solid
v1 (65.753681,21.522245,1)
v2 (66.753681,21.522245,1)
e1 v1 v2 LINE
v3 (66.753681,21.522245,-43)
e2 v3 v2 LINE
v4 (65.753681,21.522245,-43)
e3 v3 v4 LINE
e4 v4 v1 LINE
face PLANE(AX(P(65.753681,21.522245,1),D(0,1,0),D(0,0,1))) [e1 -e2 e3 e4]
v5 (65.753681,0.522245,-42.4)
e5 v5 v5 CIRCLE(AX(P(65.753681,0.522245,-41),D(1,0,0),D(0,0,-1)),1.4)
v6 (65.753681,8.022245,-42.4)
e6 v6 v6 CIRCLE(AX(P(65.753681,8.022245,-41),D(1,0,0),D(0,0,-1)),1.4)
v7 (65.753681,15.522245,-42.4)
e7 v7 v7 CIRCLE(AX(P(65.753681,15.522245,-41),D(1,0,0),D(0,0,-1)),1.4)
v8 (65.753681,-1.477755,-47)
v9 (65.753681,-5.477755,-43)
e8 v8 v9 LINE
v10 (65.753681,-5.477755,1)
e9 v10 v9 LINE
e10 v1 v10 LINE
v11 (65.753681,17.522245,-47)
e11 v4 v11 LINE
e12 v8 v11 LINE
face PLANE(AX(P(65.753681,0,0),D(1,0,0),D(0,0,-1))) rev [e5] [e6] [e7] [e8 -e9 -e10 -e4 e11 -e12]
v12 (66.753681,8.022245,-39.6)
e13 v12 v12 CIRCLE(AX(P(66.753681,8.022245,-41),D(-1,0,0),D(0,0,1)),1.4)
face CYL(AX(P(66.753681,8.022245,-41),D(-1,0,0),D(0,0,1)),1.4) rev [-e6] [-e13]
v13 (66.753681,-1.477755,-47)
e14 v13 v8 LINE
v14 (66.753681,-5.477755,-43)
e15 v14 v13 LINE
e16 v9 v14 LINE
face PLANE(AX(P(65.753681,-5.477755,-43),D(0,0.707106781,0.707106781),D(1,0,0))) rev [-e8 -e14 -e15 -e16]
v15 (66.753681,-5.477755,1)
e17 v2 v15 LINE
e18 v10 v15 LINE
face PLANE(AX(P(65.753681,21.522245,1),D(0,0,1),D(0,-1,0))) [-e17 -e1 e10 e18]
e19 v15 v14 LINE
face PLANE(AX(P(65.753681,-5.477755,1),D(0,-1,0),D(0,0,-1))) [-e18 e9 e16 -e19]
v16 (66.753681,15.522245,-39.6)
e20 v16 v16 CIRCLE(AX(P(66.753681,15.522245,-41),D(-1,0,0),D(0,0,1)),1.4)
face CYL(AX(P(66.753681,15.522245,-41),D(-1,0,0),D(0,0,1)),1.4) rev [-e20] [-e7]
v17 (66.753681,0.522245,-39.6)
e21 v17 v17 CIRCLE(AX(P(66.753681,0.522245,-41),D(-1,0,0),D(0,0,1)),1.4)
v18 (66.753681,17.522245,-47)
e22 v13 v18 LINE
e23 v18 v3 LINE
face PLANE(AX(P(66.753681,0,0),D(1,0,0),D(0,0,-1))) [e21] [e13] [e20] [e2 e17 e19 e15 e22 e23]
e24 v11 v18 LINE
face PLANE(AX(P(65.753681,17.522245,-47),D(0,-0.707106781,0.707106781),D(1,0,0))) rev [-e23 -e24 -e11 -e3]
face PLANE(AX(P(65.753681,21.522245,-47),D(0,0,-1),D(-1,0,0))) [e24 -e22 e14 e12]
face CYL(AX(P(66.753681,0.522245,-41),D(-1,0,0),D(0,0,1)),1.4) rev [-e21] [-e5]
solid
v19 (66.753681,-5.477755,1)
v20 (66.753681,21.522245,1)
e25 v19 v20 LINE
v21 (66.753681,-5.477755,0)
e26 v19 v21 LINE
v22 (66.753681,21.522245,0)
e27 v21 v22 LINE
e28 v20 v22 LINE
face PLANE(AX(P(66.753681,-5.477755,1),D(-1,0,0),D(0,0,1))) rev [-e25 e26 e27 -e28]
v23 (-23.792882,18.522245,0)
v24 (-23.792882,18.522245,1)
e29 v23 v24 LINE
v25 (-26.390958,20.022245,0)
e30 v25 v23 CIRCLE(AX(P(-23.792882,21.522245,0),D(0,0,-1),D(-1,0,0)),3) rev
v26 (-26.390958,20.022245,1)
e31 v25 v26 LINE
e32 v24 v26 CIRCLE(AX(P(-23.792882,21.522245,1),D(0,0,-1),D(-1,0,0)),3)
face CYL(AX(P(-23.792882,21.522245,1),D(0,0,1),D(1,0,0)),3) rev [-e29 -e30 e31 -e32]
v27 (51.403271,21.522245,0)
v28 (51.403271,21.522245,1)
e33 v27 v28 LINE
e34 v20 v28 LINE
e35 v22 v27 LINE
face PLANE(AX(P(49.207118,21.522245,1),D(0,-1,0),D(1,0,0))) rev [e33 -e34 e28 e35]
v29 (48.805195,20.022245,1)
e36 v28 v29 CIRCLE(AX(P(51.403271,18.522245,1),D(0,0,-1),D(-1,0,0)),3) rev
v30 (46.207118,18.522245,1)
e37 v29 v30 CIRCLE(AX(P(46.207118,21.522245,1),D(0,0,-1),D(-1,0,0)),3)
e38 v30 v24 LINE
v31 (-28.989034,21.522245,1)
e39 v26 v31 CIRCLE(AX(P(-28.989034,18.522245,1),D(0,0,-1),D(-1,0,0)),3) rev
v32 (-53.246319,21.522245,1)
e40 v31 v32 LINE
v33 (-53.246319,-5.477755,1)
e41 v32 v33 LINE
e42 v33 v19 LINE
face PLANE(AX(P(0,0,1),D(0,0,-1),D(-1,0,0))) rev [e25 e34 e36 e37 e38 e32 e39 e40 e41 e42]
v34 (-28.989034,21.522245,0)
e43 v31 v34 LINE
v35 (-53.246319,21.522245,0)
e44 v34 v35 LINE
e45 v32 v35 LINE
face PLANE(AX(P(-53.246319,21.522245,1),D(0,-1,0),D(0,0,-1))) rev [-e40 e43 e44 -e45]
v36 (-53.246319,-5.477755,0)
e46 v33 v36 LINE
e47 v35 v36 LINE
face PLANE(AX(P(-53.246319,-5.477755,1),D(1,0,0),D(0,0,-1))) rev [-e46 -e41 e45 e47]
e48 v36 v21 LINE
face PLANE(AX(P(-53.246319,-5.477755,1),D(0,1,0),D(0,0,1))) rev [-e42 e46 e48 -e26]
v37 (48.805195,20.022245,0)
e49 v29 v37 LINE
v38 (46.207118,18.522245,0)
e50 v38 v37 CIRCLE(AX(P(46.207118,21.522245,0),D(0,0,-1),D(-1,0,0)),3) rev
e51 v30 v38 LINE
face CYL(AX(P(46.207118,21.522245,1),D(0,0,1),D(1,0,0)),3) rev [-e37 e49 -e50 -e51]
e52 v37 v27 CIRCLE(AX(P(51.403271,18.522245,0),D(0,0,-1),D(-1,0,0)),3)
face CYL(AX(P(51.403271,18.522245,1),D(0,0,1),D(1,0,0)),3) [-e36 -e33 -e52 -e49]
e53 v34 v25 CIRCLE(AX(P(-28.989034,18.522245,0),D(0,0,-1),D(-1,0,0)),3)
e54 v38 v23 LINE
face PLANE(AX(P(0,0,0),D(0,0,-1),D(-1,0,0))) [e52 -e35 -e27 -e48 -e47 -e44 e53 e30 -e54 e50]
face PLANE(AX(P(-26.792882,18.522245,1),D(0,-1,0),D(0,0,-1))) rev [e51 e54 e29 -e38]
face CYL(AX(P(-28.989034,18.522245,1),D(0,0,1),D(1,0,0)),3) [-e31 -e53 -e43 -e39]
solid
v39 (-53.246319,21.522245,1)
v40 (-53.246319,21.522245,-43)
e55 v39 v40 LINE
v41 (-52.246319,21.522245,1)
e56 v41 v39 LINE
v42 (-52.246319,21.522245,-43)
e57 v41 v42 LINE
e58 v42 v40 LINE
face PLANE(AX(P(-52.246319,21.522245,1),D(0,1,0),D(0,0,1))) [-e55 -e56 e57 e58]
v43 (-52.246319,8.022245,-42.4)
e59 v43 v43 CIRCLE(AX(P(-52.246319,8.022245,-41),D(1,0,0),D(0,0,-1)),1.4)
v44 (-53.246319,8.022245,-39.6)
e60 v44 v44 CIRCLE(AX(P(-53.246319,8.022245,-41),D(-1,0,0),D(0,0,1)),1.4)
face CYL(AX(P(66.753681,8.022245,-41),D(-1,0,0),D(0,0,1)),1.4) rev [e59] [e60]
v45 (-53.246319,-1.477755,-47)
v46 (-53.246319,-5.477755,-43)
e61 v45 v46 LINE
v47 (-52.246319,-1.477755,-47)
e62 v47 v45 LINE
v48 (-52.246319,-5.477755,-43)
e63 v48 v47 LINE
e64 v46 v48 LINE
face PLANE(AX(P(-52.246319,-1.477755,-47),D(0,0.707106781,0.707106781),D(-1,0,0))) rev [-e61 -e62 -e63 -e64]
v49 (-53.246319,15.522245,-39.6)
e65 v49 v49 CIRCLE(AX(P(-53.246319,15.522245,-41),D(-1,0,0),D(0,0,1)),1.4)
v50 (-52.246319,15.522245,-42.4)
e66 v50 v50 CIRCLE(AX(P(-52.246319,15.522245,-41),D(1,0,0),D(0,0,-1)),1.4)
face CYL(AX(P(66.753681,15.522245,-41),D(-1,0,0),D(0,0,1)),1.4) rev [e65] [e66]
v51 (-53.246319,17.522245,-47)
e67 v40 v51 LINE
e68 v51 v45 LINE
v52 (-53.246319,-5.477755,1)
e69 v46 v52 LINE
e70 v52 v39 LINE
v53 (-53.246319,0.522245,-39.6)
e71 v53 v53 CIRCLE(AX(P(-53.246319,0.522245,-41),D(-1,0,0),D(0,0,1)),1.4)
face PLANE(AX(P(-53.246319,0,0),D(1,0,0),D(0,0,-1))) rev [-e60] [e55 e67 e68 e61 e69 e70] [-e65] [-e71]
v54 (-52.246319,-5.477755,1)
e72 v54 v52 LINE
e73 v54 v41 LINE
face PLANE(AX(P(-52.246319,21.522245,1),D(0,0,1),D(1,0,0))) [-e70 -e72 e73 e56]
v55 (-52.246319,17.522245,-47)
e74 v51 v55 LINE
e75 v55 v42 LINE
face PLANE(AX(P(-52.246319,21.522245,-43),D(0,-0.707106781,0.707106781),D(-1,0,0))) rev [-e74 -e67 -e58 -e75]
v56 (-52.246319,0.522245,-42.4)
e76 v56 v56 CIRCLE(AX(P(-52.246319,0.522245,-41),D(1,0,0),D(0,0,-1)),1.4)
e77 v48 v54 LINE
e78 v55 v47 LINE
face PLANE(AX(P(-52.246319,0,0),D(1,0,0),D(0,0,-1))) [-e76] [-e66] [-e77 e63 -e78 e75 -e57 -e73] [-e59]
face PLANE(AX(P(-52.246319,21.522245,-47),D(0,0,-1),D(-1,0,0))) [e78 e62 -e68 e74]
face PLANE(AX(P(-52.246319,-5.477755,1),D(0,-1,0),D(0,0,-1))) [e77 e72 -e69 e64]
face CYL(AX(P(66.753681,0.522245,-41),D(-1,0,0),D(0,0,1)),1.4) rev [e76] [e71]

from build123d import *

# Parameters (mm, degrees)
BOSS_EXTRUDE1_DEPTH = 1
SKETCH3_W           = 48
SKETCH3_H           = 27
BASE_FLANGE1_DEPTH  = 1
CHAMFER1_SIZE       = 4
FILLET1_R           = 3
FILLET2_R           = 3
SKETCH8_W           = 48
SKETCH8_H           = 27
BASE_FLANGE2_DEPTH  = 1
CHAMFER2_SIZE       = 4
SKETCH11_R          = 1.4
CUT_EXTRUDE1_DEPTH  = 131.660656096


# Sheet-metal steps are written as plain solids
with BuildPart() as part:
    # Sketch1 → Boss-Extrude1 (new body)
    with BuildSketch(Plane.XY):
        Polygon((-53.246318657, -5.477755158), (66.753681343, -5.477755158), (66.753681343, 21.522244842), (49.207118364, 21.522244842), (49.207118364, 18.522244842), (-26.792881636, 18.522244842), (-26.792881636, 21.522244842), (-53.246318657, 21.522244842), align=None)
    extrude(amount=BOSS_EXTRUDE1_DEPTH)

    # Fillet1
    fillet1_edges = [part.edges().sort_by_distance(p)[0] for p in [
        (-26.792881636, 18.522244842, 0.5),
        (49.207118364, 18.522244842, 0.5),
    ]]
    fillet(fillet1_edges, radius=FILLET1_R - 0.0001)  # a hair under: the kernel refuses the full size

    # Fillet2
    fillet2_edges = [part.edges().sort_by_distance(p)[0] for p in [
        (-26.792881636, 21.522244842, 0.5),
        (49.207118364, 21.522244842, 0.5),
    ]]
    fillet(fillet2_edges, radius=FILLET2_R)


with BuildPart() as body_2:
    # Sketch3 → Base-Flange1 (new body)
    with BuildSketch(Plane(origin=(66.753681343, 0, 0), x_dir=(0, 0, -1), z_dir=(1, 0, 0))):
        with Locations((23, 8.022244842)):
            Rectangle(SKETCH3_W, SKETCH3_H)
    extrude(amount=-BASE_FLANGE1_DEPTH)

    # Chamfer1
    chamfer1_edges = [body_2.edges().sort_by_distance(p)[0] for p in [
        (66.253681343, 21.522244842, -47),
        (66.253681343, -5.477755158, -47),
    ]]
    chamfer(chamfer1_edges, length=CHAMFER1_SIZE)


with BuildPart() as body_3:
    # Sketch8 → Base-Flange2 (new body)
    with BuildSketch(Plane.ZY.offset(53.246318657)):
        with Locations((-23, 8.022244842)):
            Rectangle(SKETCH8_W, SKETCH8_H)
    extrude(amount=-BASE_FLANGE2_DEPTH)

    # Chamfer2
    chamfer2_edges = [body_3.edges().sort_by_distance(p)[0] for p in [
        (-52.746318657, -5.477755158, -47),
        (-52.746318657, 21.522244842, -47),
    ]]
    chamfer(chamfer2_edges, length=CHAMFER2_SIZE)


with BuildPart() as cut_extrude1_tool:
    # Sketch11 → Cut-Extrude1 (new, through all)
    with BuildSketch(Plane.ZY.offset(53.246318657)):
        with Locations((-41, 15.522244842)):
            Circle(SKETCH11_R)
        with Locations((-41, 8.022244842)):
            Circle(SKETCH11_R)
        with Locations((-41, 0.522244842)):
            Circle(SKETCH11_R)
    extrude(amount=-CUT_EXTRUDE1_DEPTH)


with BuildPart() as body_2_1:
    add(body_2.part)

    # Cut-Extrude1: cut by cut_extrude1_tool
    add(cut_extrude1_tool.part, mode=Mode.SUBTRACT)


with BuildPart() as body_3_1:
    add(body_3.part)

    # Cut-Extrude1: cut by cut_extrude1_tool
    add(cut_extrude1_tool.part, mode=Mode.SUBTRACT)


solid = Compound([part.part, body_2_1.part, body_3_1.part])
